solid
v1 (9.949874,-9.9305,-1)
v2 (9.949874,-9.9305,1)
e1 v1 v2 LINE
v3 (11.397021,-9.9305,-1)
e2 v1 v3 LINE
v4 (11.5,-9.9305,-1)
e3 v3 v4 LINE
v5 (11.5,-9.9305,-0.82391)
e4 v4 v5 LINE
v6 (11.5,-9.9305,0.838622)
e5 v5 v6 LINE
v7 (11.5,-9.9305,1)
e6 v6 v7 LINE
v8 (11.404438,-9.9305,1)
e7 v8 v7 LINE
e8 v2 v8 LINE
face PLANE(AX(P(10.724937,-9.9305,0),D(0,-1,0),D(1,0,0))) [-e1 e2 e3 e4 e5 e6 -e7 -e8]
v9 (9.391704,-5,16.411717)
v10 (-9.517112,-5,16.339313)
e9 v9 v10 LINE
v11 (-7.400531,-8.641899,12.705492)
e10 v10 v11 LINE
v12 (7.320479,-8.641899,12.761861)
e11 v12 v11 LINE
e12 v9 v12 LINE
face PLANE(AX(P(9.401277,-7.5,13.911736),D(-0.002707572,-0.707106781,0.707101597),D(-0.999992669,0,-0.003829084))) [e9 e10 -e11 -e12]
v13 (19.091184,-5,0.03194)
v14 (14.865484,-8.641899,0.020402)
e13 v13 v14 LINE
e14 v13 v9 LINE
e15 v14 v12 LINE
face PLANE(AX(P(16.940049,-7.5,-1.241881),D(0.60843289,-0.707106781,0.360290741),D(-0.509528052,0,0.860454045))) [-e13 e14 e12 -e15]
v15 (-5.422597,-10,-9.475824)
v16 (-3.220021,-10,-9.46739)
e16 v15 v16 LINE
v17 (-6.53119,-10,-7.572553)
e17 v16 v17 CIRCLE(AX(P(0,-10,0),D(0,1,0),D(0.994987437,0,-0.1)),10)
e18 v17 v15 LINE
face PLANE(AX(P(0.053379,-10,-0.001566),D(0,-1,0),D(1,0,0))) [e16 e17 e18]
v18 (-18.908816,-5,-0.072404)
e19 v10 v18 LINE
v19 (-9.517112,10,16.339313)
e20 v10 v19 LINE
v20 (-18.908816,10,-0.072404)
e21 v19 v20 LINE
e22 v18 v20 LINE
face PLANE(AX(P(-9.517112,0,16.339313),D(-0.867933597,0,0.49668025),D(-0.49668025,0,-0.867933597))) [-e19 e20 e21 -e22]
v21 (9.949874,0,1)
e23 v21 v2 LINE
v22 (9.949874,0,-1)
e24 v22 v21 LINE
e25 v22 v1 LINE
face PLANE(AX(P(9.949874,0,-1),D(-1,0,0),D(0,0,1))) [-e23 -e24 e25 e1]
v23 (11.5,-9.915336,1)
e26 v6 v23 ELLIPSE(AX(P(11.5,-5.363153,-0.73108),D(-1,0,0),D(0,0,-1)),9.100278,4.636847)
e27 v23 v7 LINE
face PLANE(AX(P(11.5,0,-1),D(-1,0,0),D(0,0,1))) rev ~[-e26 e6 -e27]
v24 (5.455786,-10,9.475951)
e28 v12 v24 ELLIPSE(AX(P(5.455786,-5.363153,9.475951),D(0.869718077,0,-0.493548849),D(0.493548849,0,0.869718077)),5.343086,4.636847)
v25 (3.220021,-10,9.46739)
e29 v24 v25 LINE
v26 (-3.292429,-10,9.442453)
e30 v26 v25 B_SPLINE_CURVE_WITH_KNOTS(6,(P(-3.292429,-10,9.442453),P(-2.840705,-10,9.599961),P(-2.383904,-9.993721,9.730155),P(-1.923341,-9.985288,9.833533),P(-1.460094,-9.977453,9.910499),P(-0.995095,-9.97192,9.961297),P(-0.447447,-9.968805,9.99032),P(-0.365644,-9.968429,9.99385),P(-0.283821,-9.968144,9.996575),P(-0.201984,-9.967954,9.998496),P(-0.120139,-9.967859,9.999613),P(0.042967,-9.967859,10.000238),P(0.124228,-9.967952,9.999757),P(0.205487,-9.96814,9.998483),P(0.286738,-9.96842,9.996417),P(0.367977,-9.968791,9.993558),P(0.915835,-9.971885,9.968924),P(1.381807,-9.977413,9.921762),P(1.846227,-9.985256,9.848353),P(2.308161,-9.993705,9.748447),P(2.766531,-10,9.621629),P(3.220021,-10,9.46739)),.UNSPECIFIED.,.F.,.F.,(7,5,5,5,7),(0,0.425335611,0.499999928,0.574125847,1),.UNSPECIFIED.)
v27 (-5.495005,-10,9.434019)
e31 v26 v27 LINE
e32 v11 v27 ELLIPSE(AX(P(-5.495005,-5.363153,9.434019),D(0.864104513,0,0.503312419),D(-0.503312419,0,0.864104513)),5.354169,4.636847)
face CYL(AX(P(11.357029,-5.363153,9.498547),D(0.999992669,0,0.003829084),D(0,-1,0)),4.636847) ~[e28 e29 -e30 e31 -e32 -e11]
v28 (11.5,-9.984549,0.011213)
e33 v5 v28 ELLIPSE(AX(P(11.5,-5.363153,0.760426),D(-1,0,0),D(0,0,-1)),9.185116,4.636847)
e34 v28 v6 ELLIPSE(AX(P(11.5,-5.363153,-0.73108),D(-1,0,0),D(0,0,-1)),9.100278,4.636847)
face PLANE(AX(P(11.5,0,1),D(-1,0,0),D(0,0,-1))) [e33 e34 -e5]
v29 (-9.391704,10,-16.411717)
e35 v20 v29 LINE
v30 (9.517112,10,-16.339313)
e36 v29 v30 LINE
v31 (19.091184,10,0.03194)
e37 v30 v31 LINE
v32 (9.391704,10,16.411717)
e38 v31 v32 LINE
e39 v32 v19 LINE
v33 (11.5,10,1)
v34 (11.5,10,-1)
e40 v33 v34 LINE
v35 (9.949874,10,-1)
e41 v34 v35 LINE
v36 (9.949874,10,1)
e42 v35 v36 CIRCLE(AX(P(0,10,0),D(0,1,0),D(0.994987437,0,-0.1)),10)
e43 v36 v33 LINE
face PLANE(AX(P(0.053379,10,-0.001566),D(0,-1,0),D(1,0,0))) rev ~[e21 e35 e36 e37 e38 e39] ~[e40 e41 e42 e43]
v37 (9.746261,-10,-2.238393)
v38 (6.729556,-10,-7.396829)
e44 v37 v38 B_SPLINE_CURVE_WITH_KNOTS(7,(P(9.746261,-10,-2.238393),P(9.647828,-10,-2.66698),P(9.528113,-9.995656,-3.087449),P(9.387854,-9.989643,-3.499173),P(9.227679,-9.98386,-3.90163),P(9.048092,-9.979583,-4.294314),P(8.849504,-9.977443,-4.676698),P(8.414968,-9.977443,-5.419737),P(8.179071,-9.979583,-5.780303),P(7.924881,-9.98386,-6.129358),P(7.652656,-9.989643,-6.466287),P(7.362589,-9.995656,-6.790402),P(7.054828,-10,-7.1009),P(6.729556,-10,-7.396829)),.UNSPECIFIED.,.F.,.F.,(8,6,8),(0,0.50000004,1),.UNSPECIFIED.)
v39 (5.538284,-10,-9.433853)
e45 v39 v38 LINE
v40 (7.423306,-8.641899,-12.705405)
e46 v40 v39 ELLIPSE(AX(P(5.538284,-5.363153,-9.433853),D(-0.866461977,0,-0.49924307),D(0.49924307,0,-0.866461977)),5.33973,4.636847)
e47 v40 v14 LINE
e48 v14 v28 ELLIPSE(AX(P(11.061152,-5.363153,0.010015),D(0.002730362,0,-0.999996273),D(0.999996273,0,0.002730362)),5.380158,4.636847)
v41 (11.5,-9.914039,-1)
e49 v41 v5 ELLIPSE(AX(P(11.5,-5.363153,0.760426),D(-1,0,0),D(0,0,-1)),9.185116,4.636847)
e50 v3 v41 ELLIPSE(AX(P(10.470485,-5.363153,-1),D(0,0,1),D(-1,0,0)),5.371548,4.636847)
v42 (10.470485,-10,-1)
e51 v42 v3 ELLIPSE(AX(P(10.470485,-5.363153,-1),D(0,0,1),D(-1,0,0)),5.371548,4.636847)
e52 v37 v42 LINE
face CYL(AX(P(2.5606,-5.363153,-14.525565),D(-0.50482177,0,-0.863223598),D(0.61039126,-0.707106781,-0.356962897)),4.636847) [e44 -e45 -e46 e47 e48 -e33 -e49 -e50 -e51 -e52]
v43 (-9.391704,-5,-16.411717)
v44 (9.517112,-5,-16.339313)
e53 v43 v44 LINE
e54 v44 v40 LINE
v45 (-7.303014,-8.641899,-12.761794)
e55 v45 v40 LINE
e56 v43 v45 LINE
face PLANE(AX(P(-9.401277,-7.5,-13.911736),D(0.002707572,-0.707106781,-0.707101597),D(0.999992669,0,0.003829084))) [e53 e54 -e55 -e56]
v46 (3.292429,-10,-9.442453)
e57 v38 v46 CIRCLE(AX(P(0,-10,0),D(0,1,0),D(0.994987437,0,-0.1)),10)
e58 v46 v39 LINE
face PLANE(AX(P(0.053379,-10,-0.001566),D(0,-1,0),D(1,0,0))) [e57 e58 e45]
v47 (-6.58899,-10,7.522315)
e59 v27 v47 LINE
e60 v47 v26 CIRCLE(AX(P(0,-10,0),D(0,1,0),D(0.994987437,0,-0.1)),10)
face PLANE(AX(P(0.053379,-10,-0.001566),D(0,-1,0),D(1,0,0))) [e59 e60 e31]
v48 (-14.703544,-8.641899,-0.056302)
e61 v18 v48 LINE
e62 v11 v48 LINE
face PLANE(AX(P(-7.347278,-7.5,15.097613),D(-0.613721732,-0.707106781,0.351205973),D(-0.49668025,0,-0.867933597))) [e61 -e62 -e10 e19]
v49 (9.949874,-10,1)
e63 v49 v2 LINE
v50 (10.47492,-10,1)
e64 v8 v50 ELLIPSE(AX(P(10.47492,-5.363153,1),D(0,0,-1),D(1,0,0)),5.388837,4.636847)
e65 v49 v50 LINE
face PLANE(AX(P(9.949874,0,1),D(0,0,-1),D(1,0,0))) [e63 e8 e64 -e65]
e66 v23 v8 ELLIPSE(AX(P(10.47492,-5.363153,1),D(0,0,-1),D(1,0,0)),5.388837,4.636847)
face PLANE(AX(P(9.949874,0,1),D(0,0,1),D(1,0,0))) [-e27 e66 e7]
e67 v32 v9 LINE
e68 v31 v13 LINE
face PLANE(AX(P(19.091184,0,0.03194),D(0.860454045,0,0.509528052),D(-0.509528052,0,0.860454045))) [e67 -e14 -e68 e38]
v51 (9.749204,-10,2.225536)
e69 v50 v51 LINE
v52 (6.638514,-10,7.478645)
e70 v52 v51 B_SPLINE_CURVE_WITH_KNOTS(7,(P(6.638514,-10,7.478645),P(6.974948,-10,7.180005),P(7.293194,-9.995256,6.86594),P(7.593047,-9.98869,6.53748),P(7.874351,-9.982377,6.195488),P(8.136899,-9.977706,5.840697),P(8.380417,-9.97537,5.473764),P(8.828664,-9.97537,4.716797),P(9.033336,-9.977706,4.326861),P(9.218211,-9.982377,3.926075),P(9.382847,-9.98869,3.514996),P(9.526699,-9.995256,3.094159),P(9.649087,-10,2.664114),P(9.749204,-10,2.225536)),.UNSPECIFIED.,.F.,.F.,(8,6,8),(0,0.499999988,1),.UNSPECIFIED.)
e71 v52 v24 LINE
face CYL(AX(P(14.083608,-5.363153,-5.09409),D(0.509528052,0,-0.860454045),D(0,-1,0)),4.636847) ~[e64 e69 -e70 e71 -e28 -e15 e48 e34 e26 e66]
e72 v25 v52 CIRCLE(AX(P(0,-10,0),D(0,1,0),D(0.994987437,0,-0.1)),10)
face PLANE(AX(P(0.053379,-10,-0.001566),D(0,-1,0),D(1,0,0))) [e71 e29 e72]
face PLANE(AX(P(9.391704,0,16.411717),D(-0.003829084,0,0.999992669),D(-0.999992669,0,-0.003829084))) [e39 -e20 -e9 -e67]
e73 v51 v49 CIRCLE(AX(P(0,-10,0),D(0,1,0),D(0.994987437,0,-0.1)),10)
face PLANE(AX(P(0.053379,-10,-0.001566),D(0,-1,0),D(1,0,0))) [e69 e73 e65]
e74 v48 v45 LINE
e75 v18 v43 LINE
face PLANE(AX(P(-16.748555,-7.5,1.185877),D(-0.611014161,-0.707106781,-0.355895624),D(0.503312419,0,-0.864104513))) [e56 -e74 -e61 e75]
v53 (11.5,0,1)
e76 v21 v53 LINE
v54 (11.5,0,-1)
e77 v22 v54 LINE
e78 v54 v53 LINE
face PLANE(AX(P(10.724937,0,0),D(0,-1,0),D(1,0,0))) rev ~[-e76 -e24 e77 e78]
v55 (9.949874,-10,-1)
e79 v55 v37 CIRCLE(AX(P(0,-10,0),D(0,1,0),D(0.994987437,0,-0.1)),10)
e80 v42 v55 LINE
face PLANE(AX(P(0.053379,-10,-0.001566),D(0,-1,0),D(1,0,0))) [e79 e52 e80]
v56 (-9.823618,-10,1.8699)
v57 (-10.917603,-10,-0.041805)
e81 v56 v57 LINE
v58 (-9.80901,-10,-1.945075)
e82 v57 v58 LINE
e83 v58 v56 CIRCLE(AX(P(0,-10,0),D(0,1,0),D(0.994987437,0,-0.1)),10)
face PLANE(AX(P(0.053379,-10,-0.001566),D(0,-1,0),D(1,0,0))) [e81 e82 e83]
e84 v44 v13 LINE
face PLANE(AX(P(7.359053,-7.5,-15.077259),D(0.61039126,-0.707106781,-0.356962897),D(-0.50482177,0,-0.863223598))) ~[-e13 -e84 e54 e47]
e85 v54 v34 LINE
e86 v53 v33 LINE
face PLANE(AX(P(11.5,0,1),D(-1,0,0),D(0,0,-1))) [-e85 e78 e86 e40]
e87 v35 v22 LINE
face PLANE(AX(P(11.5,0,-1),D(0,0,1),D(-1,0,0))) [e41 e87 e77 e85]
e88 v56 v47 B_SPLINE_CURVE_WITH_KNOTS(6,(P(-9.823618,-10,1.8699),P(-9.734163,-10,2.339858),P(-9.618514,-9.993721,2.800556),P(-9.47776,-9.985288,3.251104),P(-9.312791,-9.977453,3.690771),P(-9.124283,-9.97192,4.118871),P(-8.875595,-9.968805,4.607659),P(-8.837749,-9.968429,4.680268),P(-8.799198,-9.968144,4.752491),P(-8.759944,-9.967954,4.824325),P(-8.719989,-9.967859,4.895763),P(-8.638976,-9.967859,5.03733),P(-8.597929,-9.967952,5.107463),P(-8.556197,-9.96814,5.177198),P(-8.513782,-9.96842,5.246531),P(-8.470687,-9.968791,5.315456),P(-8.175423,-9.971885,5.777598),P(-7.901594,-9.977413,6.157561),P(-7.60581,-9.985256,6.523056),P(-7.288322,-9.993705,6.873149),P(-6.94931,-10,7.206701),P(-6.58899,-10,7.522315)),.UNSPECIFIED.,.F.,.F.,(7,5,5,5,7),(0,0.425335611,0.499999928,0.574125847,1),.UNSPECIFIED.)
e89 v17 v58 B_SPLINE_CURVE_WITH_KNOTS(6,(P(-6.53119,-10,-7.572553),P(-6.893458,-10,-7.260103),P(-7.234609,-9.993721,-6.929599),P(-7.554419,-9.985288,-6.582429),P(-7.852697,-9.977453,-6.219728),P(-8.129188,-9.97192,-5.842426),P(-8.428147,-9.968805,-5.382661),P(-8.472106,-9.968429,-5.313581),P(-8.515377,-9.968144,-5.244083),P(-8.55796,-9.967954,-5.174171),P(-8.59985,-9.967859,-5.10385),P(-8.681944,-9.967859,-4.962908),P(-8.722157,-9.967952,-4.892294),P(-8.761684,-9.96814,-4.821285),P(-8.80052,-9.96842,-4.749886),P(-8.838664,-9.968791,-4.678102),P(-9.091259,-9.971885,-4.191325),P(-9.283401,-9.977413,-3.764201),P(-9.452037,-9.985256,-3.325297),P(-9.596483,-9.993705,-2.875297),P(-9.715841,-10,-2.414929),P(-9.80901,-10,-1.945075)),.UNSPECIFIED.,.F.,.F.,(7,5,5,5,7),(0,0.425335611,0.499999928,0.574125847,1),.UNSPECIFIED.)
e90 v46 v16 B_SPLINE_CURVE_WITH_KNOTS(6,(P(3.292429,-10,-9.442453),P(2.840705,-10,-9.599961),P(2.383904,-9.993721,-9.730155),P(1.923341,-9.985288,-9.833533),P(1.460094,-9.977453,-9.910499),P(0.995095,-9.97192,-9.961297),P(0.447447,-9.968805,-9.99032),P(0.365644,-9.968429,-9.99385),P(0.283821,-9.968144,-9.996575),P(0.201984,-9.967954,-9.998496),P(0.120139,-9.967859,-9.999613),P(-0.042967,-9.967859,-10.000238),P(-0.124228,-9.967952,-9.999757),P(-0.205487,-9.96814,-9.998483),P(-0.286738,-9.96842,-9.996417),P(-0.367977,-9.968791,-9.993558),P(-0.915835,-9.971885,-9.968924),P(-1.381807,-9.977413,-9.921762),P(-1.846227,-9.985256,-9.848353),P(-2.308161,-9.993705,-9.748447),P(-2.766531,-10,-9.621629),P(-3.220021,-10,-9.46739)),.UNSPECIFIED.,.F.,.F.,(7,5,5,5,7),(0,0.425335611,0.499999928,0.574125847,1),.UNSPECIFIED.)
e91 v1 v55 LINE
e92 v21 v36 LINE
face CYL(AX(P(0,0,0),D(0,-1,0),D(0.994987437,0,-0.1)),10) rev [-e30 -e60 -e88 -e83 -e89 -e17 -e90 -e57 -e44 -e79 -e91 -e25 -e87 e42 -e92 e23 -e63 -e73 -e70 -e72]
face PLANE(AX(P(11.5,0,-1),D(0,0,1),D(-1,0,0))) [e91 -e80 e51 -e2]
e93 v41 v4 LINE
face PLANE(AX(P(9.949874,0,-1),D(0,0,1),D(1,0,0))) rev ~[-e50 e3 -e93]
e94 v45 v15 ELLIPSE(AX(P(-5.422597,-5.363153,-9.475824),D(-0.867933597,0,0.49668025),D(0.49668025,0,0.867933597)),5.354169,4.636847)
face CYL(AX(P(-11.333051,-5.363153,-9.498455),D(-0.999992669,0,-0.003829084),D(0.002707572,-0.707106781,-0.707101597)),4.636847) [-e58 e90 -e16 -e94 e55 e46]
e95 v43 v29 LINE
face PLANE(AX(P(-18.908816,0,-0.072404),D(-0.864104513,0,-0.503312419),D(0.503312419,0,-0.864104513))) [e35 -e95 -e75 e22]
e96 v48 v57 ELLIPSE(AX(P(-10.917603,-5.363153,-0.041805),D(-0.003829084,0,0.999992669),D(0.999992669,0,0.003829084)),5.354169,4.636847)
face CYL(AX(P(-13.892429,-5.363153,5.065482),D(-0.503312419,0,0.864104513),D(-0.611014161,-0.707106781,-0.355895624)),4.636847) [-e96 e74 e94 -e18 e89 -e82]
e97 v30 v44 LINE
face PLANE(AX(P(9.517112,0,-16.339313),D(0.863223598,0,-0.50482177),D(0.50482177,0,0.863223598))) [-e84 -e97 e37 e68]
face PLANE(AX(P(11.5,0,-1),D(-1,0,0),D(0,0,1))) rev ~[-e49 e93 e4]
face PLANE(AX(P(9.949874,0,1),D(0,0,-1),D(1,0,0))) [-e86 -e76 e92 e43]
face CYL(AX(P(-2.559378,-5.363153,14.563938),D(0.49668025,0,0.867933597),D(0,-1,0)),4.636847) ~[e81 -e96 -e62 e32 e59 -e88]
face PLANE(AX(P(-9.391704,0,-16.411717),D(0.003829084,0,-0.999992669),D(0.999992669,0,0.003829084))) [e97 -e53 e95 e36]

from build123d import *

# Parameters (mm, degrees)
F1_DEPTH     = 10
F2_SIZE      = 5
F3_T1_DEPTH  = 22.73867608
F3_T3_DEPTH  = 22.73867608
F3_T5_DEPTH  = 22.762654105
F3_T7_DEPTH  = 22.8342533194
F3_T9_DEPTH  = 22.7705922303
F3_T11_DEPTH = 22.7699440814
F0_W         = 1.5501256289
F0_H         = 2
F4_DEPTH     = 9.9305


# Not quite as in the source:
# - a fillet or chamfer that OpenCascade refuses, or shapes differently, is made with other operations: its cross-section is extruded or revolved along the edge and cut away or added


with BuildPart() as f1:
    # F0 (on Front) → F1 (new body, symmetric)
    with BuildSketch(Plane.XZ):
        Polygon((-9.3917044375, -16.4117172223), (9.5171118155, -16.3393132389), (19.091183747, 0.0319395585), (9.3917044375, 16.4117172223), (-9.5171118155, 16.3393132389), (-18.908816253, -0.0724039835), align=None)
        with BuildLine():
            ThreePointArc((9.9498743711, -1), (-10, 0), (9.9498743711, 1))
            Line((9.9498743711, 1), (11.5, 1))
            Line((11.5, 1), (11.5, -1))
            Line((11.5, -1), (9.9498743711, -1))
        make_face(mode=Mode.SUBTRACT)
    extrude(amount=F1_DEPTH, both=True)

    # F2
    f2_edges = [f1.edges().sort_by_distance(p)[0] for p in [
        (-14.212964, -10, 8.133455),
        (-14.15026, -10, -8.242061),
        (14.241444, -10, 8.221828),
        (0.062704, -10, -16.375515),
        (14.304148, -10, -8.153687),
        (-0.062704, -10, 16.375515),
    ]]
    chamfer(f2_edges, length=F2_SIZE)

    # F3: fillet of radius 4.6368466753 on 6 edges, made by hand

    # F3_s2 → F3_t1 (cut)
    with BuildSketch(Plane(origin=(5.6469256621, 0, 9.8678304624), x_dir=(0, 1, 0), z_dir=(-0.4966802502, 0, -0.8679335972))):
        with BuildLine():
            ThreePointArc((-10, -9.4549905003), (-9.6470410634, -11.2294349014), (-8.6418990521, -12.7337362278))
            Line((-8.6418990521, -12.7337362278), (-10, -11.3756352799))
            Line((-10, -11.3756352799), (-10, -9.4549905003))
        make_face()
    extrude(amount=F3_T1_DEPTH, mode=Mode.SUBTRACT)

    # F3_s4 → F3_t3 (cut)
    with BuildSketch(Plane(origin=(-5.7223290296, 0, 9.8242963078), x_dir=(0, 1, 0), z_dir=(0.5033124188, 0, -0.8641045128))):
        with BuildLine():
            ThreePointArc((-8.6418990521, -12.7337362278), (-9.6470410634, -11.2294349014), (-10, -9.4549905003))
            Line((-10, -9.4549905003), (-10, -11.3756352799))
            Line((-10, -11.3756352799), (-8.6418990521, -12.7337362278))
        make_face()
    extrude(amount=F3_T3_DEPTH, mode=Mode.SUBTRACT)

    # F3_s6 → F3_t5 (cut)
    with BuildSketch(Plane(origin=(11.393232541, 0, 0.0436259684), x_dir=(0, 1, 0), z_dir=(-0.999992669, 0, -0.0038290844))):
        with BuildLine():
            ThreePointArc((-10, -9.4549905003), (-9.6470410634, -11.2294349014), (-8.6418990521, -12.7337362278))
            Line((-8.6418990521, -12.7337362278), (-10, -11.3756352799))
            Line((-10, -11.3756352799), (-10, -9.4549905003))
        make_face()
    extrude(amount=F3_T5_DEPTH, mode=Mode.SUBTRACT)

    # F3_s8 → F3_t7 (cut)
    with BuildSketch(Plane(origin=(5.8897484246, 0, -9.9461802651), x_dir=(0, 1, 0), z_dir=(-0.5095280522, 0, 0.8604540453))):
        with BuildLine():
            ThreePointArc((-10, -9.5227156054), (-9.6470410634, -11.2971600064), (-8.6418990521, -12.8014613328))
            Line((-8.6418990521, -12.8014613328), (-10, -11.443360385))
            Line((-10, -11.443360385), (-10, -9.5227156054))
        make_face()
    extrude(amount=F3_T7_DEPTH, mode=Mode.SUBTRACT)

    # F3_s10 → F3_t9 (cut)
    with BuildSketch(Plane(origin=(-5.677308487, 0, -9.7079542659), x_dir=(0, 1, 0), z_dir=(0.5048217704, 0, 0.863223598))):
        with BuildLine():
            ThreePointArc((-8.6418990521, -12.8219374878), (-9.6470410634, -11.3176361614), (-10, -9.5431917603))
            Line((-10, -9.5431917603), (-10, -11.4638365399))
            Line((-10, -11.4638365399), (-8.6418990521, -12.8219374878))
        make_face()
    extrude(amount=F3_T9_DEPTH, mode=Mode.SUBTRACT)

    # F3_s12 → F3_t11 (cut)
    with BuildSketch(Plane(origin=(-11.3692546917, 0, -0.0435341545), x_dir=(0, 1, 0), z_dir=(0.999992669, 0, 0.0038290844))):
        with BuildLine():
            ThreePointArc((-8.6418990521, -12.7337362278), (-9.6470410634, -11.2294349014), (-10, -9.4549905003))
            Line((-10, -9.4549905003), (-10, -11.3756352799))
            Line((-10, -11.3756352799), (-8.6418990521, -12.7337362278))
        make_face()
    extrude(amount=F3_T11_DEPTH, mode=Mode.SUBTRACT)

    # F0 (on Front) → F4 (join)
    with BuildSketch(Plane.XZ):
        with Locations((10.7249371855, 0)):
            Rectangle(F0_W, F0_H)
    extrude(amount=F4_DEPTH)


solid = f1.part
